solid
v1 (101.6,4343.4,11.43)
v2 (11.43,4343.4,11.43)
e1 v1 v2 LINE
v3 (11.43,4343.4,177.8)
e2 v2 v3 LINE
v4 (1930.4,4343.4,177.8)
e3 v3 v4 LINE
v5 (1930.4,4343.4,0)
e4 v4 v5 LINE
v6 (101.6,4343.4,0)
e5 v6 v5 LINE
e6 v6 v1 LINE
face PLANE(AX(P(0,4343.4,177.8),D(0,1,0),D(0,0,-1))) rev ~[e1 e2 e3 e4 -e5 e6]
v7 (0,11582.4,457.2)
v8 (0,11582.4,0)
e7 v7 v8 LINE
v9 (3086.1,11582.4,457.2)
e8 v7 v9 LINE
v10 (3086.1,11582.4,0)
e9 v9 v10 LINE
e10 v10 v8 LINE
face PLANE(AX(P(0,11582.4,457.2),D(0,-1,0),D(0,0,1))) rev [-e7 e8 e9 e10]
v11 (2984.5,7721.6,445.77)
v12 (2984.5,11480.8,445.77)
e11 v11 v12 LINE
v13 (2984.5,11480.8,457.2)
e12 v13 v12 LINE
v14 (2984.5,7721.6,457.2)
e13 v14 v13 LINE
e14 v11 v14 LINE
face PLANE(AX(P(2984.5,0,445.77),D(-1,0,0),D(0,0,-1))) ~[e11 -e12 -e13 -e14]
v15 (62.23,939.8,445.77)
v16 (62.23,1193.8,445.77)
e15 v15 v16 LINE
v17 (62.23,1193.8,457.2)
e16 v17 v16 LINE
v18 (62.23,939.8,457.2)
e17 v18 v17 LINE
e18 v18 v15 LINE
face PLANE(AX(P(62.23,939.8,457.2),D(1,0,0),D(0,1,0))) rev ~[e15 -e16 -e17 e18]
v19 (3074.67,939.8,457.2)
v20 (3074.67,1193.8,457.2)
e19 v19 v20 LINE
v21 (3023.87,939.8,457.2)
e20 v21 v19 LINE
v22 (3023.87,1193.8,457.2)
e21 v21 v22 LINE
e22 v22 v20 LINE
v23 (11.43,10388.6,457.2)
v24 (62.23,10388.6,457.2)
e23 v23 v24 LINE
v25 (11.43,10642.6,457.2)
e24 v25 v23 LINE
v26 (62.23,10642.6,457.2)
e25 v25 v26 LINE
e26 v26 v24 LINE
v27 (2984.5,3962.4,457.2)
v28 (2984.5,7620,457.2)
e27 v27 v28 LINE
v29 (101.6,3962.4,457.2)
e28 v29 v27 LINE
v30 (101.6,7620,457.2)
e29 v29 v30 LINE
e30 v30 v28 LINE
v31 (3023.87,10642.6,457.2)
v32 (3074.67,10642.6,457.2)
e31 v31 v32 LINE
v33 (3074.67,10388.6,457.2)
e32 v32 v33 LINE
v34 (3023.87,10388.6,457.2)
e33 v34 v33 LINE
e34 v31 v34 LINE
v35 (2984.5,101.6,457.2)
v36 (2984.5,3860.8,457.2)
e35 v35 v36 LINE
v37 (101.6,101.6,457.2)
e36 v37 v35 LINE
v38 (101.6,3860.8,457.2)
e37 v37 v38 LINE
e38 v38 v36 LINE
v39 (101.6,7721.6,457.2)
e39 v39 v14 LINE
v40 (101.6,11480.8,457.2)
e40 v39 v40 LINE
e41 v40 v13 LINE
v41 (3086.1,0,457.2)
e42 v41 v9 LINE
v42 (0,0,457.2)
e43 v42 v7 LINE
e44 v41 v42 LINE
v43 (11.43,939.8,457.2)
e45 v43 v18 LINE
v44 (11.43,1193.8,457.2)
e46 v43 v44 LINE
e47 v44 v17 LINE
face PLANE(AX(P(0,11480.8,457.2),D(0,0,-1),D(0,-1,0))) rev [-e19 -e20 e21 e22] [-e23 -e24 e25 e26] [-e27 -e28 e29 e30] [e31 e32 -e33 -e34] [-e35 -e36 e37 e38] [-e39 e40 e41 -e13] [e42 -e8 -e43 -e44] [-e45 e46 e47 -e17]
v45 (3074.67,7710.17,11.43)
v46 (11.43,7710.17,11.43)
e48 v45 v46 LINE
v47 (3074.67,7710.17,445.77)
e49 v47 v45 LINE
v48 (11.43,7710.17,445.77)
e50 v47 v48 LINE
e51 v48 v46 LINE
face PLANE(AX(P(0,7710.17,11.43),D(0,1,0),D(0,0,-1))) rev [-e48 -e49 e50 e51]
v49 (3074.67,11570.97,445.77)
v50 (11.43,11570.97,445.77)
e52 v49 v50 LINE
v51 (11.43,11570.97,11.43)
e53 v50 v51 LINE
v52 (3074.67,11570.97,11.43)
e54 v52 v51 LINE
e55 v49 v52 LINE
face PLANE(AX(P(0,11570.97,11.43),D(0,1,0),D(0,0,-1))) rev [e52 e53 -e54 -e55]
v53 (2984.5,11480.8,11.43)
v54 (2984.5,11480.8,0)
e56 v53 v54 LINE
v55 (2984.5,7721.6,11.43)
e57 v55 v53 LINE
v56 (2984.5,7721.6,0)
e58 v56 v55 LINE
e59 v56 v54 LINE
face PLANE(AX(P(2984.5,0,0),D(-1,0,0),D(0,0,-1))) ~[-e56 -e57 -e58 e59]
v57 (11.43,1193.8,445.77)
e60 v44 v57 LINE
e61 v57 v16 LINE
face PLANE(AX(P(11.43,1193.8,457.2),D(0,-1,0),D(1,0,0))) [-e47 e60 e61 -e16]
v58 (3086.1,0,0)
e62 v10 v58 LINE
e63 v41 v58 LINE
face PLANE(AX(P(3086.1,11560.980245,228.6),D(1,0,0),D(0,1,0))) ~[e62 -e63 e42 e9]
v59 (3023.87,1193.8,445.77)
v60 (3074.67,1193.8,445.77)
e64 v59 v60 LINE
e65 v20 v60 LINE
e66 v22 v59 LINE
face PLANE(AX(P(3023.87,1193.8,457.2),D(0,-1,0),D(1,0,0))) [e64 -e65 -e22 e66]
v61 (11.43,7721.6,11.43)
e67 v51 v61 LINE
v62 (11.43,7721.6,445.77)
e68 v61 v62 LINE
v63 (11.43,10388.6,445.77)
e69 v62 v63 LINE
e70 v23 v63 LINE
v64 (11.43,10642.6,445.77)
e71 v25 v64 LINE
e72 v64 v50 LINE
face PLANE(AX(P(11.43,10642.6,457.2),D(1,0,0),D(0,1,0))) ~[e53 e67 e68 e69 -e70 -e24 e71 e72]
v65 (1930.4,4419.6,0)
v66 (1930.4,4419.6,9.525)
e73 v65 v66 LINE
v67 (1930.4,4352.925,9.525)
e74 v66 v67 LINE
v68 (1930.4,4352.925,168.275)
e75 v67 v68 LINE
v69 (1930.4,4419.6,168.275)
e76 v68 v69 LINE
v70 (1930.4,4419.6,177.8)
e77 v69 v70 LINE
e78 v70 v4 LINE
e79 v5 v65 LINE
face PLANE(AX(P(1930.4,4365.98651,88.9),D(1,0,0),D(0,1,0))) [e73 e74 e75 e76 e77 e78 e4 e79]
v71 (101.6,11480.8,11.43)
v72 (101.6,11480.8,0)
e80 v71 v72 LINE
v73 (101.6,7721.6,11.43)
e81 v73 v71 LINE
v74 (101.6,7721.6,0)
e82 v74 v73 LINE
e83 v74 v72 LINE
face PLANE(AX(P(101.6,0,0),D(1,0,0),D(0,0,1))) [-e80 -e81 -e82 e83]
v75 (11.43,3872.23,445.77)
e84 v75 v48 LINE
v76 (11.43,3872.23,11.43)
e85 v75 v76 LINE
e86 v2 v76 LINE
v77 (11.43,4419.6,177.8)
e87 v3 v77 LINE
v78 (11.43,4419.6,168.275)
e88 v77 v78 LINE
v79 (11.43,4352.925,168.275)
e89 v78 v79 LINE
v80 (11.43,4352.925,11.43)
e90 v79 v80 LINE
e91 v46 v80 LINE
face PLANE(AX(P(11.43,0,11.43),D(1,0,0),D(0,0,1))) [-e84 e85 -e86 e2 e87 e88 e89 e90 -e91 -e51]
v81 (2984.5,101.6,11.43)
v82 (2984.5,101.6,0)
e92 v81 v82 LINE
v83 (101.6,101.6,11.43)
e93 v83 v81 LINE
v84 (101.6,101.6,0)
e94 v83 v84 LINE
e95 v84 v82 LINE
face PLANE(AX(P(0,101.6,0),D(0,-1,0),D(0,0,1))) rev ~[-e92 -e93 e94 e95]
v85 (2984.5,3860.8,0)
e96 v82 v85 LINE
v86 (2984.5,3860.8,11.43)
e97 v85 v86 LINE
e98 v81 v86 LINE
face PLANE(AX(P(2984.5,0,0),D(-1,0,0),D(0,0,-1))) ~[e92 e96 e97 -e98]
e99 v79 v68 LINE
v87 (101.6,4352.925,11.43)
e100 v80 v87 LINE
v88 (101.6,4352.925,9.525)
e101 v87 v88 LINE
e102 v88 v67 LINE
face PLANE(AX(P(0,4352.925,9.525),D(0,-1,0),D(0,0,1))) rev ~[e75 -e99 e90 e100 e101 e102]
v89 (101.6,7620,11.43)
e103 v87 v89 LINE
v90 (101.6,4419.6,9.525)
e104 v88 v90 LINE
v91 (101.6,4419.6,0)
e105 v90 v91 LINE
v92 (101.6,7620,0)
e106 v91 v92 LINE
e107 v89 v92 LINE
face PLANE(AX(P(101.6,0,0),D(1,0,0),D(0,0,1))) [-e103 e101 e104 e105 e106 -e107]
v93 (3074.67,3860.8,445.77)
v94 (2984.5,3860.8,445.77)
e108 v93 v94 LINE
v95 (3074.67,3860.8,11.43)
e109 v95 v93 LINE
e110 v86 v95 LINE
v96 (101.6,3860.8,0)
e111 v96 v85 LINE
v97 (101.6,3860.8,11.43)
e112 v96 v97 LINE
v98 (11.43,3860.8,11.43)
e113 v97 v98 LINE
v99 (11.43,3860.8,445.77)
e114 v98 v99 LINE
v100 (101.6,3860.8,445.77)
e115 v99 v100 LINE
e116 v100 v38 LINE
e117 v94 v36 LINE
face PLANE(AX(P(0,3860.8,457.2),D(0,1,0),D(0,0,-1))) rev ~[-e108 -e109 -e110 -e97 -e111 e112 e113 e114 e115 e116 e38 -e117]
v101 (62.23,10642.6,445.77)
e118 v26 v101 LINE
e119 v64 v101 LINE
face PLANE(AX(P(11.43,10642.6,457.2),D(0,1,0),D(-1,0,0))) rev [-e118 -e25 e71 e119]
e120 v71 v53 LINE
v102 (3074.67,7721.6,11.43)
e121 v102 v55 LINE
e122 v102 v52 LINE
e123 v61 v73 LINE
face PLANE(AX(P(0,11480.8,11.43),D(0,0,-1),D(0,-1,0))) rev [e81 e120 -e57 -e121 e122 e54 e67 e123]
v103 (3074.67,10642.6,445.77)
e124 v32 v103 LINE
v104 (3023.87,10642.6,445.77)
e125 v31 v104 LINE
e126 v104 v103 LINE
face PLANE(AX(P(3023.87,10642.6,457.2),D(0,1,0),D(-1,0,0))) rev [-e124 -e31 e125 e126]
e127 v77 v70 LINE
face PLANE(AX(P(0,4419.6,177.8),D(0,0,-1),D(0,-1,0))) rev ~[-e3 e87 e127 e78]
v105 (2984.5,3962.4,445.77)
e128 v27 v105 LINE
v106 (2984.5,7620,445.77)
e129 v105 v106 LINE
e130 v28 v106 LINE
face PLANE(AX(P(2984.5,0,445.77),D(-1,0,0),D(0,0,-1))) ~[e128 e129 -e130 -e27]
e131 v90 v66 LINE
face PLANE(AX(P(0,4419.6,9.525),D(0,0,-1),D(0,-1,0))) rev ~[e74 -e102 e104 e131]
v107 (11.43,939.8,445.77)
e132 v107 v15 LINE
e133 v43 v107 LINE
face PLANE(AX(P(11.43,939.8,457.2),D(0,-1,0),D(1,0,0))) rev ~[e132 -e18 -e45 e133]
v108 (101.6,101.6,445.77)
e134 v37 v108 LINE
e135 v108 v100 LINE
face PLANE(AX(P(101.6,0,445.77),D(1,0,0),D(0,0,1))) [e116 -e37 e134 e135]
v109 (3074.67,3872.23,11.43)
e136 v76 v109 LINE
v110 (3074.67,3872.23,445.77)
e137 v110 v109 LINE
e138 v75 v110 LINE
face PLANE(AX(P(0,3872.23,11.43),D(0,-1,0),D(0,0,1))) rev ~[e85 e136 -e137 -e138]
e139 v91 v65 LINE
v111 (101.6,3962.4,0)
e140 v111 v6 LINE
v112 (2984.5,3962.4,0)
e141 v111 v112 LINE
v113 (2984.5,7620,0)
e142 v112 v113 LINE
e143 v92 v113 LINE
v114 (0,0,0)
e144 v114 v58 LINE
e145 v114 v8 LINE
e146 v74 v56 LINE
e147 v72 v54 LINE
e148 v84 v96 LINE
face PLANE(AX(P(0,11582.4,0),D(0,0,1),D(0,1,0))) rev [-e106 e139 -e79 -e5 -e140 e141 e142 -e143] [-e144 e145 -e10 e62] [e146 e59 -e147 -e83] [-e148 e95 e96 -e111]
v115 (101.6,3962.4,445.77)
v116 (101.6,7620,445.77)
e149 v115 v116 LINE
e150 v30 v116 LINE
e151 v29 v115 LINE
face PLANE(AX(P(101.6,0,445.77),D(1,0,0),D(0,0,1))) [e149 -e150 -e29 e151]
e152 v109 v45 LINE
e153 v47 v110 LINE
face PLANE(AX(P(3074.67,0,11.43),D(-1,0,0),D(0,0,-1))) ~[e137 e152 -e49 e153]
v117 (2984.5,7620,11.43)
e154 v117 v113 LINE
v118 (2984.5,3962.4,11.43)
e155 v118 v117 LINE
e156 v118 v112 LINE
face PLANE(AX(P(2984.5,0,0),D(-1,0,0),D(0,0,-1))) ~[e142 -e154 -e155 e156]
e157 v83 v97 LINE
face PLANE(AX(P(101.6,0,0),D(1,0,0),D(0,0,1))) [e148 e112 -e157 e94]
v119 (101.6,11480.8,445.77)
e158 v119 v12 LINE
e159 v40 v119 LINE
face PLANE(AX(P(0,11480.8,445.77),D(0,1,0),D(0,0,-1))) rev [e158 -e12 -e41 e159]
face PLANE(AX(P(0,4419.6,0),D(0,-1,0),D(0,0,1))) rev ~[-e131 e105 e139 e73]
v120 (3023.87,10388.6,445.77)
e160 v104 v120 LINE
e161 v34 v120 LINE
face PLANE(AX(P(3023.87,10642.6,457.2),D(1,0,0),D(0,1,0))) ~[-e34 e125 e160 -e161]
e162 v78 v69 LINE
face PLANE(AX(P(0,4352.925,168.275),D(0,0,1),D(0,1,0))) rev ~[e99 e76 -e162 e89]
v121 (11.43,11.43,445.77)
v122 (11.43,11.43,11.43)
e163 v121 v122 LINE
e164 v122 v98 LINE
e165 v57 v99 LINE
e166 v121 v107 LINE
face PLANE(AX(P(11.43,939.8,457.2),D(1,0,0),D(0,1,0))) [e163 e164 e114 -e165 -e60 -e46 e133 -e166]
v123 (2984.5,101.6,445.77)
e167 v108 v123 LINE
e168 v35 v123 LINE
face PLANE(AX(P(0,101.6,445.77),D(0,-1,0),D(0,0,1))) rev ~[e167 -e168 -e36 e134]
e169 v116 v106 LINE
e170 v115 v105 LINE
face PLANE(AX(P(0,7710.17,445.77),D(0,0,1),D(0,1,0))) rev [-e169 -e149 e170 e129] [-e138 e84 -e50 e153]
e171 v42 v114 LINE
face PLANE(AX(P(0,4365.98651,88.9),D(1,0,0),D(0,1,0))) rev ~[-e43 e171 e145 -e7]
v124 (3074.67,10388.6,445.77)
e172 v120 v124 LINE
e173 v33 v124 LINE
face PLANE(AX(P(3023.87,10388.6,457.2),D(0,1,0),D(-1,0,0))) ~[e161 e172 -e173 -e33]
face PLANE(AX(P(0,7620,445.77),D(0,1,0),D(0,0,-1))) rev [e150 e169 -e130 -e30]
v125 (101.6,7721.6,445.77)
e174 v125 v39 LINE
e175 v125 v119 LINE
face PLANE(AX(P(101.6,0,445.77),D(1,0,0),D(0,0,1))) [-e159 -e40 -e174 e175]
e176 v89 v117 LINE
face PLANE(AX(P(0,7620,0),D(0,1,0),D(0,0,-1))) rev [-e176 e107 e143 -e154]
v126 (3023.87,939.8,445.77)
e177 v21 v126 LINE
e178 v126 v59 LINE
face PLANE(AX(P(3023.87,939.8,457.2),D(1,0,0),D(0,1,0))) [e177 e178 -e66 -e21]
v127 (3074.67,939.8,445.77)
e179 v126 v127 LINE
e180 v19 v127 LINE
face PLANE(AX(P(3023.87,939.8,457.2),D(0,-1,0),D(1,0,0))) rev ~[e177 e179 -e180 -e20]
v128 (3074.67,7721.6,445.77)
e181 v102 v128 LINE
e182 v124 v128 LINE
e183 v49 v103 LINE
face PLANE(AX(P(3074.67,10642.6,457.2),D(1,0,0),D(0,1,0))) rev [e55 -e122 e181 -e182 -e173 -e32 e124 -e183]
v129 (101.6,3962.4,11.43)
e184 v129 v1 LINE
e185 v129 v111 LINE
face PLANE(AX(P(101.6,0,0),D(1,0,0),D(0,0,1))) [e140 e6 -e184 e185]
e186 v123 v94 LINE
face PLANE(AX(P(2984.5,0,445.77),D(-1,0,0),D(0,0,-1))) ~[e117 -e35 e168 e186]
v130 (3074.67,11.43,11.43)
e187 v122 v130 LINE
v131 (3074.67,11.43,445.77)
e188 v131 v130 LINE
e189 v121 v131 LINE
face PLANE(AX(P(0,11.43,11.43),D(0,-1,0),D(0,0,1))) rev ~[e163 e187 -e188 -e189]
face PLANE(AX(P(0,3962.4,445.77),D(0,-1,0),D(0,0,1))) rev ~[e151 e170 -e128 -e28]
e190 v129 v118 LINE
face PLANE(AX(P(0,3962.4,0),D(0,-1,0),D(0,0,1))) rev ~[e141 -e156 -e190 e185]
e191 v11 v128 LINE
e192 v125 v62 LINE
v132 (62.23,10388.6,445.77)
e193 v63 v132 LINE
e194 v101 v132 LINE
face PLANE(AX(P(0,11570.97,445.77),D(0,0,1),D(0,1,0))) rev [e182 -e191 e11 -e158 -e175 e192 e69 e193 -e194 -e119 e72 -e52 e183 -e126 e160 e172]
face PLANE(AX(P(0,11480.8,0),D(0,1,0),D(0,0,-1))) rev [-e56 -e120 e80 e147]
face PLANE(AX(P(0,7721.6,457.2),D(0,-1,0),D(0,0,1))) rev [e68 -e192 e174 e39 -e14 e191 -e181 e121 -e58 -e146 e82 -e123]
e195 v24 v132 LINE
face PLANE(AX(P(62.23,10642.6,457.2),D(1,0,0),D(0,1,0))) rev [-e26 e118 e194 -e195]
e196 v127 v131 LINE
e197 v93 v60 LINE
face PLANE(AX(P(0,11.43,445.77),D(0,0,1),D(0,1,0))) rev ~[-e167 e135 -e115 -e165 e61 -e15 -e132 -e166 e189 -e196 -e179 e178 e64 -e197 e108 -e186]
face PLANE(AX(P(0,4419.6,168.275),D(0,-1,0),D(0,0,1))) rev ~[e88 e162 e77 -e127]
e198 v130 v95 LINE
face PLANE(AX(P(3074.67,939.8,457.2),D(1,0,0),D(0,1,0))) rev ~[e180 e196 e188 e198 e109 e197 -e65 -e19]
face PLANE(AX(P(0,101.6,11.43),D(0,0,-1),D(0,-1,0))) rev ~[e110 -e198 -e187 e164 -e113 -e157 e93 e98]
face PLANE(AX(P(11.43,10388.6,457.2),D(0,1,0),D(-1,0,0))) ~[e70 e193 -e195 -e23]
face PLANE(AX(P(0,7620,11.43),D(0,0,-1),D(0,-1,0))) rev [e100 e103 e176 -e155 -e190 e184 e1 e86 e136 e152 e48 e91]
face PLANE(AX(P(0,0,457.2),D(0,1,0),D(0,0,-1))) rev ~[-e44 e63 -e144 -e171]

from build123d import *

# Parameters (mm, degrees)
F2_DEPTH  = 11582.4
F6_DEPTH  = 3086.1
F10_W     = 50.8
F10_H     = 254
F11_DEPTH = 11.43
F13_DEPTH = 1930.4


# Not quite as in the source:
# - a pattern or mirror of a feature is missing from the dataset's text; its kind, count and spacing are read off the source's solid


with BuildPart() as f2:
    # F1 (on Front) → F2 (new body, through all)
    with BuildSketch(Plane.XZ):
        Polygon((0, 457.2), (0, 0), (101.6, 0), (101.6, 11.43), (11.43, 11.43), (11.43, 445.77), (101.6, 445.77), (101.6, 457.2), align=None)
    extrude(amount=-F2_DEPTH)

    # F5 (on Right) → F6 (join, through all)
    with BuildSketch(Plane.YZ):
        Polygon((0, 457.2), (0, 0), (101.6, 0), (101.6, 11.43), (11.43, 11.43), (11.43, 445.77), (101.6, 445.77), (101.6, 457.2), align=None)
        Polygon((3860.8, 457.2), (3860.8, 0), (3962.4, 0), (3962.4, 11.43), (3872.23, 11.43), (3872.23, 445.77), (3962.4, 445.77), (3962.4, 457.2), align=None)
    f6 = extrude(amount=F6_DEPTH)

    # F6_copies: F6 across plane
    add(f6.mirror(Plane.ZX.offset(5791.2)))

    # F7: F2 across plane


with BuildPart() as f2_1:
    add(f2.part)
    add(f2.part.mirror(Plane.YZ.offset(1543.05)))

    # F10 (on face) → F11 (cut, through all)
    with BuildSketch(Plane.XY.offset(457.2)):
        with Locations((36.83, 1066.8)):
            Rectangle(F10_W, F10_H)
        with Locations((3049.27, 1066.8)):
            Rectangle(F10_W, F10_H)
    f11 = extrude(amount=-F11_DEPTH, mode=Mode.SUBTRACT)

    # F11_copies: F11 across plane
    add(f11.mirror(Plane.ZX.offset(5791.2)), mode=Mode.SUBTRACT)

    # F12 (on Right) → F13 (join)
    with BuildSketch(Plane.YZ):
        Polygon((4343.4, 177.8), (4343.4, 0), (4419.6, 0), (4419.6, 9.525), (4352.925, 9.525), (4352.925, 168.275), (4419.6, 168.275), (4419.6, 177.8), align=None)
    extrude(amount=F13_DEPTH)


solid = f2_1.part
